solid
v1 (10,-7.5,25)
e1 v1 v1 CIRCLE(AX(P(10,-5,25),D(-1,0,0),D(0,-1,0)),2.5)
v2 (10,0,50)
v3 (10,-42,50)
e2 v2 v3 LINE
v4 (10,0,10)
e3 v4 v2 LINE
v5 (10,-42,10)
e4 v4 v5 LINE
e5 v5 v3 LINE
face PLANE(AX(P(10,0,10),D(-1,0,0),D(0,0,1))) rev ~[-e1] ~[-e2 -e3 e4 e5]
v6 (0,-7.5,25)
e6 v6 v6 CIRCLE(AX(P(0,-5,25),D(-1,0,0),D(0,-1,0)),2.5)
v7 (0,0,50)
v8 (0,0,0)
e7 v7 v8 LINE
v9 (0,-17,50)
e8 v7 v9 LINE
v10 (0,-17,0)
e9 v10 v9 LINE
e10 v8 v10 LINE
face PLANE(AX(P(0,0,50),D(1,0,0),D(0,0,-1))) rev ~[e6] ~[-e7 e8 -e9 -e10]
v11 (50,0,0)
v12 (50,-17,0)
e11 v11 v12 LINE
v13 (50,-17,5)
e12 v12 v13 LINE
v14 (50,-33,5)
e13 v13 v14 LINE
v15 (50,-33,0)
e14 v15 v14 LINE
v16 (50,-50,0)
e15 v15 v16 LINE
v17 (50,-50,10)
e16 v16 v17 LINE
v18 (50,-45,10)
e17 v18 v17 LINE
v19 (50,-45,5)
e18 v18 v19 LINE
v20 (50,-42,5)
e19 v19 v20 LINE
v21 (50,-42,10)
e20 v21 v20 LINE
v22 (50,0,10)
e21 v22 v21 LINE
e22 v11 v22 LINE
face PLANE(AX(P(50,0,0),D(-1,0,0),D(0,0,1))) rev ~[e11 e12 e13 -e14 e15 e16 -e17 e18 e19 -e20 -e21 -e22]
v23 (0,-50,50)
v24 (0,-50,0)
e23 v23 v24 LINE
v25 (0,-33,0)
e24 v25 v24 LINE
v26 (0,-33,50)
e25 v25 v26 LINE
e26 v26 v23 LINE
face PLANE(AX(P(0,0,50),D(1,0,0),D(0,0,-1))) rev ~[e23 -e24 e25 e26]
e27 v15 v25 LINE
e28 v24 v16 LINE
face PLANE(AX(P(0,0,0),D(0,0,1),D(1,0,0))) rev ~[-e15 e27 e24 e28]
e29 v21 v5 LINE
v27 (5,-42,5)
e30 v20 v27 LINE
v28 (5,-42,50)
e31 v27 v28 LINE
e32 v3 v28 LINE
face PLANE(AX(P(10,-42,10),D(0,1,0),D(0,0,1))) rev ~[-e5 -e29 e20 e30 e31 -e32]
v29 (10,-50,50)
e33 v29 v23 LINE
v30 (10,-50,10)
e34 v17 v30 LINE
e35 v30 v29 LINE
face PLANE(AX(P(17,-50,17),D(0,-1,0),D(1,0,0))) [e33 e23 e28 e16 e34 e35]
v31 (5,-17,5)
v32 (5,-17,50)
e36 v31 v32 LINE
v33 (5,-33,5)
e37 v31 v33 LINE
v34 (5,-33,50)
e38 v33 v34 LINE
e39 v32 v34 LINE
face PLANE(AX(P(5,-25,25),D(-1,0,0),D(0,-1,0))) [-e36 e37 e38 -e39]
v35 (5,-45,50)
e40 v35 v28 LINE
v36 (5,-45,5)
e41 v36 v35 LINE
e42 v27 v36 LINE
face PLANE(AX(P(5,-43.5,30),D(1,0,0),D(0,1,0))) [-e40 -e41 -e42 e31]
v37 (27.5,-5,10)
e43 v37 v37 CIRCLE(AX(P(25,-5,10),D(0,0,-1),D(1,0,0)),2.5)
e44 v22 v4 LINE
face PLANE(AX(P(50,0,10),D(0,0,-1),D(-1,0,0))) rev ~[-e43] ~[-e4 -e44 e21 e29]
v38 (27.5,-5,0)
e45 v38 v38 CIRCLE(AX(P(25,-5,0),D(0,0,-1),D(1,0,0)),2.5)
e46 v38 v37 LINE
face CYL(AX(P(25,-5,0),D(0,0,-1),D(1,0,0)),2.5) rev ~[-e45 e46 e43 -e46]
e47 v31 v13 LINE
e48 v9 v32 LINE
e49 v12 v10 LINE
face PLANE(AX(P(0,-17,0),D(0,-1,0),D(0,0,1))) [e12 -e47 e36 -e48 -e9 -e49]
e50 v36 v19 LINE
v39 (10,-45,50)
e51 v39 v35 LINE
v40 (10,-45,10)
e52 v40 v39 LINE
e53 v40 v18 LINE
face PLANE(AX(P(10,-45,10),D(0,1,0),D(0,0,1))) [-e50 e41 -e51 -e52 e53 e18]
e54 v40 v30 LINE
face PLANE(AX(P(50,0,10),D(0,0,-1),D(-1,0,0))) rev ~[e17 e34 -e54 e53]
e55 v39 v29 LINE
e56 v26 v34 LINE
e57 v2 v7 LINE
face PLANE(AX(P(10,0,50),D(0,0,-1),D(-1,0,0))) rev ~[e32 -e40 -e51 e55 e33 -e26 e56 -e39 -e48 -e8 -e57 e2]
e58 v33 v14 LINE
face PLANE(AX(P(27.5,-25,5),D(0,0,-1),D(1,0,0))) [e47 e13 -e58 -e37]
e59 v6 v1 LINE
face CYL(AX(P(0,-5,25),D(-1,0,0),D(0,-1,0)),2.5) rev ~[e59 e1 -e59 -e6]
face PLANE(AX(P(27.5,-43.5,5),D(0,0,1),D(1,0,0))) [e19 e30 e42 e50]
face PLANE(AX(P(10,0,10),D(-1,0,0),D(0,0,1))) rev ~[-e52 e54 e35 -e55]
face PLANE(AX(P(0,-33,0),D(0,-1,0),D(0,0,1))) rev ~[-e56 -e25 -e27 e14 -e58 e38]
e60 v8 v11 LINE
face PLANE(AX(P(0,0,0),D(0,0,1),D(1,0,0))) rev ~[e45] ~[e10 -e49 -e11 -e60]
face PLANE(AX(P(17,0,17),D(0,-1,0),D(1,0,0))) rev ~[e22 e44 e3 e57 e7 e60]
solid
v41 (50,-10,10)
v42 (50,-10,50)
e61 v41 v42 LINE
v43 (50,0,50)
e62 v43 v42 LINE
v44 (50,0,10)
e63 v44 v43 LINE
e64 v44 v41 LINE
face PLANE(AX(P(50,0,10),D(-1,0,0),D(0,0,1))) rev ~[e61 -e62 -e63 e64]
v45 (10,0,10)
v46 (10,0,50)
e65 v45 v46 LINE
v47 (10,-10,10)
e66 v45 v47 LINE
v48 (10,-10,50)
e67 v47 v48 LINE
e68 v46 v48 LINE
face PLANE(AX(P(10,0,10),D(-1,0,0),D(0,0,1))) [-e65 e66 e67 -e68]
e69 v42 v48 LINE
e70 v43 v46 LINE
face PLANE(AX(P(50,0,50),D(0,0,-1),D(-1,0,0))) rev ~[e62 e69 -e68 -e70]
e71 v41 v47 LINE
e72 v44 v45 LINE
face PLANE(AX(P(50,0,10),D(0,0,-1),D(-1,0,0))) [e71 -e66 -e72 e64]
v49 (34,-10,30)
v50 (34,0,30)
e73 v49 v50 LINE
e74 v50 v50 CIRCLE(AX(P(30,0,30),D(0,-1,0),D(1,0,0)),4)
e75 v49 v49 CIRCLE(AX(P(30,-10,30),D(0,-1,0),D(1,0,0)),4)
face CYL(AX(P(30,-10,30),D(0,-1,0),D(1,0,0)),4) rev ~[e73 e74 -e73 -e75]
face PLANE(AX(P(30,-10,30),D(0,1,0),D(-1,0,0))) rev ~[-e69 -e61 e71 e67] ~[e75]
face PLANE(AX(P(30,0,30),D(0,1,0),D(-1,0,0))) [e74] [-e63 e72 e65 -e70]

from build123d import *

# Parameters (mm, degrees)
F1_DEPTH  = 50
F2_W      = 3
F2_H      = 40
F3_DEPTH  = 5
F5_DEPTH  = 5
F6_W      = 40
F6_H      = 40
F7_DEPTH  = 10
F8_R      = 4
F9_DEPTH  = 10
F10_W     = 16
F10_H     = 50
F11_DEPTH = 5
F12_W     = 45
F12_H     = 16
F13_DEPTH = 5
F14_R     = 2.5
F15_DEPTH = 25
F16_R     = 2.5
F17_DEPTH = 25


with BuildPart() as f1:
    # F0 (on Front) → F1 (new body)
    with BuildSketch(Plane.XZ):
        Polygon((0, 50), (0, 0), (50, 0), (50, 10), (10, 10), (10, 50), align=None)
    extrude(amount=F1_DEPTH)

    # F2 (on face) → F3 (cut)
    with BuildSketch(Plane.YZ.offset(10)):
        with Locations((-43.5, 30)):
            Rectangle(F2_W, F2_H)
    extrude(amount=-F3_DEPTH, mode=Mode.SUBTRACT)

    # F4 (on face) → F5 (cut)
    with BuildSketch(Plane.XY.offset(10)):
        Polygon((5, -45), (10, -45), (50, -45), (50, -42), (10, -42), (5, -42), align=None)
    extrude(amount=-F5_DEPTH, mode=Mode.SUBTRACT)

    # F10 (on face) → F11 (cut)
    with BuildSketch(Plane(origin=(0, 0, 0), x_dir=(0, -1, 0), z_dir=(-1, 0, 0))):
        with Locations((25, 25)):
            Rectangle(F10_W, F10_H)
    extrude(amount=-F11_DEPTH, mode=Mode.SUBTRACT)

    # F12 (on face) → F13 (cut)
    with BuildSketch(Plane(origin=(0, 0, 0), x_dir=(1, 0, 0), z_dir=(0, 0, -1))):
        with Locations((27.5, 25)):
            Rectangle(F12_W, F12_H)
    extrude(amount=-F13_DEPTH, mode=Mode.SUBTRACT)

    # F14 (on face) → F15 (cut)
    with BuildSketch(Plane(origin=(0, 0, 0), x_dir=(0, -1, 0), z_dir=(-1, 0, 0))):
        with Locations((5, 25)):
            Circle(F14_R)
    extrude(amount=-F15_DEPTH, mode=Mode.SUBTRACT)

    # F16 (on face) → F17 (cut)
    with BuildSketch(Plane(origin=(0, 0, 0), x_dir=(1, 0, 0), z_dir=(0, 0, -1))):
        with Locations((25, 5)):
            Circle(F16_R)
    extrude(amount=-F17_DEPTH, mode=Mode.SUBTRACT)


with BuildPart() as f7:
    # F6 (on face) → F7 (new body)
    with BuildSketch(Plane(origin=(0, 0, 0), x_dir=(-1, 0, 0), z_dir=(0, 1, 0))):
        with Locations((-30, 30)):
            Rectangle(F6_W, F6_H)
    extrude(amount=-F7_DEPTH)

    # F8 (on face) → F9 (cut)
    with BuildSketch(Plane.XZ.offset(10)):
        with Locations((30, 30)):
            Circle(F8_R)
    extrude(amount=-F9_DEPTH, mode=Mode.SUBTRACT)


solid = Compound([f1.part, f7.part])
